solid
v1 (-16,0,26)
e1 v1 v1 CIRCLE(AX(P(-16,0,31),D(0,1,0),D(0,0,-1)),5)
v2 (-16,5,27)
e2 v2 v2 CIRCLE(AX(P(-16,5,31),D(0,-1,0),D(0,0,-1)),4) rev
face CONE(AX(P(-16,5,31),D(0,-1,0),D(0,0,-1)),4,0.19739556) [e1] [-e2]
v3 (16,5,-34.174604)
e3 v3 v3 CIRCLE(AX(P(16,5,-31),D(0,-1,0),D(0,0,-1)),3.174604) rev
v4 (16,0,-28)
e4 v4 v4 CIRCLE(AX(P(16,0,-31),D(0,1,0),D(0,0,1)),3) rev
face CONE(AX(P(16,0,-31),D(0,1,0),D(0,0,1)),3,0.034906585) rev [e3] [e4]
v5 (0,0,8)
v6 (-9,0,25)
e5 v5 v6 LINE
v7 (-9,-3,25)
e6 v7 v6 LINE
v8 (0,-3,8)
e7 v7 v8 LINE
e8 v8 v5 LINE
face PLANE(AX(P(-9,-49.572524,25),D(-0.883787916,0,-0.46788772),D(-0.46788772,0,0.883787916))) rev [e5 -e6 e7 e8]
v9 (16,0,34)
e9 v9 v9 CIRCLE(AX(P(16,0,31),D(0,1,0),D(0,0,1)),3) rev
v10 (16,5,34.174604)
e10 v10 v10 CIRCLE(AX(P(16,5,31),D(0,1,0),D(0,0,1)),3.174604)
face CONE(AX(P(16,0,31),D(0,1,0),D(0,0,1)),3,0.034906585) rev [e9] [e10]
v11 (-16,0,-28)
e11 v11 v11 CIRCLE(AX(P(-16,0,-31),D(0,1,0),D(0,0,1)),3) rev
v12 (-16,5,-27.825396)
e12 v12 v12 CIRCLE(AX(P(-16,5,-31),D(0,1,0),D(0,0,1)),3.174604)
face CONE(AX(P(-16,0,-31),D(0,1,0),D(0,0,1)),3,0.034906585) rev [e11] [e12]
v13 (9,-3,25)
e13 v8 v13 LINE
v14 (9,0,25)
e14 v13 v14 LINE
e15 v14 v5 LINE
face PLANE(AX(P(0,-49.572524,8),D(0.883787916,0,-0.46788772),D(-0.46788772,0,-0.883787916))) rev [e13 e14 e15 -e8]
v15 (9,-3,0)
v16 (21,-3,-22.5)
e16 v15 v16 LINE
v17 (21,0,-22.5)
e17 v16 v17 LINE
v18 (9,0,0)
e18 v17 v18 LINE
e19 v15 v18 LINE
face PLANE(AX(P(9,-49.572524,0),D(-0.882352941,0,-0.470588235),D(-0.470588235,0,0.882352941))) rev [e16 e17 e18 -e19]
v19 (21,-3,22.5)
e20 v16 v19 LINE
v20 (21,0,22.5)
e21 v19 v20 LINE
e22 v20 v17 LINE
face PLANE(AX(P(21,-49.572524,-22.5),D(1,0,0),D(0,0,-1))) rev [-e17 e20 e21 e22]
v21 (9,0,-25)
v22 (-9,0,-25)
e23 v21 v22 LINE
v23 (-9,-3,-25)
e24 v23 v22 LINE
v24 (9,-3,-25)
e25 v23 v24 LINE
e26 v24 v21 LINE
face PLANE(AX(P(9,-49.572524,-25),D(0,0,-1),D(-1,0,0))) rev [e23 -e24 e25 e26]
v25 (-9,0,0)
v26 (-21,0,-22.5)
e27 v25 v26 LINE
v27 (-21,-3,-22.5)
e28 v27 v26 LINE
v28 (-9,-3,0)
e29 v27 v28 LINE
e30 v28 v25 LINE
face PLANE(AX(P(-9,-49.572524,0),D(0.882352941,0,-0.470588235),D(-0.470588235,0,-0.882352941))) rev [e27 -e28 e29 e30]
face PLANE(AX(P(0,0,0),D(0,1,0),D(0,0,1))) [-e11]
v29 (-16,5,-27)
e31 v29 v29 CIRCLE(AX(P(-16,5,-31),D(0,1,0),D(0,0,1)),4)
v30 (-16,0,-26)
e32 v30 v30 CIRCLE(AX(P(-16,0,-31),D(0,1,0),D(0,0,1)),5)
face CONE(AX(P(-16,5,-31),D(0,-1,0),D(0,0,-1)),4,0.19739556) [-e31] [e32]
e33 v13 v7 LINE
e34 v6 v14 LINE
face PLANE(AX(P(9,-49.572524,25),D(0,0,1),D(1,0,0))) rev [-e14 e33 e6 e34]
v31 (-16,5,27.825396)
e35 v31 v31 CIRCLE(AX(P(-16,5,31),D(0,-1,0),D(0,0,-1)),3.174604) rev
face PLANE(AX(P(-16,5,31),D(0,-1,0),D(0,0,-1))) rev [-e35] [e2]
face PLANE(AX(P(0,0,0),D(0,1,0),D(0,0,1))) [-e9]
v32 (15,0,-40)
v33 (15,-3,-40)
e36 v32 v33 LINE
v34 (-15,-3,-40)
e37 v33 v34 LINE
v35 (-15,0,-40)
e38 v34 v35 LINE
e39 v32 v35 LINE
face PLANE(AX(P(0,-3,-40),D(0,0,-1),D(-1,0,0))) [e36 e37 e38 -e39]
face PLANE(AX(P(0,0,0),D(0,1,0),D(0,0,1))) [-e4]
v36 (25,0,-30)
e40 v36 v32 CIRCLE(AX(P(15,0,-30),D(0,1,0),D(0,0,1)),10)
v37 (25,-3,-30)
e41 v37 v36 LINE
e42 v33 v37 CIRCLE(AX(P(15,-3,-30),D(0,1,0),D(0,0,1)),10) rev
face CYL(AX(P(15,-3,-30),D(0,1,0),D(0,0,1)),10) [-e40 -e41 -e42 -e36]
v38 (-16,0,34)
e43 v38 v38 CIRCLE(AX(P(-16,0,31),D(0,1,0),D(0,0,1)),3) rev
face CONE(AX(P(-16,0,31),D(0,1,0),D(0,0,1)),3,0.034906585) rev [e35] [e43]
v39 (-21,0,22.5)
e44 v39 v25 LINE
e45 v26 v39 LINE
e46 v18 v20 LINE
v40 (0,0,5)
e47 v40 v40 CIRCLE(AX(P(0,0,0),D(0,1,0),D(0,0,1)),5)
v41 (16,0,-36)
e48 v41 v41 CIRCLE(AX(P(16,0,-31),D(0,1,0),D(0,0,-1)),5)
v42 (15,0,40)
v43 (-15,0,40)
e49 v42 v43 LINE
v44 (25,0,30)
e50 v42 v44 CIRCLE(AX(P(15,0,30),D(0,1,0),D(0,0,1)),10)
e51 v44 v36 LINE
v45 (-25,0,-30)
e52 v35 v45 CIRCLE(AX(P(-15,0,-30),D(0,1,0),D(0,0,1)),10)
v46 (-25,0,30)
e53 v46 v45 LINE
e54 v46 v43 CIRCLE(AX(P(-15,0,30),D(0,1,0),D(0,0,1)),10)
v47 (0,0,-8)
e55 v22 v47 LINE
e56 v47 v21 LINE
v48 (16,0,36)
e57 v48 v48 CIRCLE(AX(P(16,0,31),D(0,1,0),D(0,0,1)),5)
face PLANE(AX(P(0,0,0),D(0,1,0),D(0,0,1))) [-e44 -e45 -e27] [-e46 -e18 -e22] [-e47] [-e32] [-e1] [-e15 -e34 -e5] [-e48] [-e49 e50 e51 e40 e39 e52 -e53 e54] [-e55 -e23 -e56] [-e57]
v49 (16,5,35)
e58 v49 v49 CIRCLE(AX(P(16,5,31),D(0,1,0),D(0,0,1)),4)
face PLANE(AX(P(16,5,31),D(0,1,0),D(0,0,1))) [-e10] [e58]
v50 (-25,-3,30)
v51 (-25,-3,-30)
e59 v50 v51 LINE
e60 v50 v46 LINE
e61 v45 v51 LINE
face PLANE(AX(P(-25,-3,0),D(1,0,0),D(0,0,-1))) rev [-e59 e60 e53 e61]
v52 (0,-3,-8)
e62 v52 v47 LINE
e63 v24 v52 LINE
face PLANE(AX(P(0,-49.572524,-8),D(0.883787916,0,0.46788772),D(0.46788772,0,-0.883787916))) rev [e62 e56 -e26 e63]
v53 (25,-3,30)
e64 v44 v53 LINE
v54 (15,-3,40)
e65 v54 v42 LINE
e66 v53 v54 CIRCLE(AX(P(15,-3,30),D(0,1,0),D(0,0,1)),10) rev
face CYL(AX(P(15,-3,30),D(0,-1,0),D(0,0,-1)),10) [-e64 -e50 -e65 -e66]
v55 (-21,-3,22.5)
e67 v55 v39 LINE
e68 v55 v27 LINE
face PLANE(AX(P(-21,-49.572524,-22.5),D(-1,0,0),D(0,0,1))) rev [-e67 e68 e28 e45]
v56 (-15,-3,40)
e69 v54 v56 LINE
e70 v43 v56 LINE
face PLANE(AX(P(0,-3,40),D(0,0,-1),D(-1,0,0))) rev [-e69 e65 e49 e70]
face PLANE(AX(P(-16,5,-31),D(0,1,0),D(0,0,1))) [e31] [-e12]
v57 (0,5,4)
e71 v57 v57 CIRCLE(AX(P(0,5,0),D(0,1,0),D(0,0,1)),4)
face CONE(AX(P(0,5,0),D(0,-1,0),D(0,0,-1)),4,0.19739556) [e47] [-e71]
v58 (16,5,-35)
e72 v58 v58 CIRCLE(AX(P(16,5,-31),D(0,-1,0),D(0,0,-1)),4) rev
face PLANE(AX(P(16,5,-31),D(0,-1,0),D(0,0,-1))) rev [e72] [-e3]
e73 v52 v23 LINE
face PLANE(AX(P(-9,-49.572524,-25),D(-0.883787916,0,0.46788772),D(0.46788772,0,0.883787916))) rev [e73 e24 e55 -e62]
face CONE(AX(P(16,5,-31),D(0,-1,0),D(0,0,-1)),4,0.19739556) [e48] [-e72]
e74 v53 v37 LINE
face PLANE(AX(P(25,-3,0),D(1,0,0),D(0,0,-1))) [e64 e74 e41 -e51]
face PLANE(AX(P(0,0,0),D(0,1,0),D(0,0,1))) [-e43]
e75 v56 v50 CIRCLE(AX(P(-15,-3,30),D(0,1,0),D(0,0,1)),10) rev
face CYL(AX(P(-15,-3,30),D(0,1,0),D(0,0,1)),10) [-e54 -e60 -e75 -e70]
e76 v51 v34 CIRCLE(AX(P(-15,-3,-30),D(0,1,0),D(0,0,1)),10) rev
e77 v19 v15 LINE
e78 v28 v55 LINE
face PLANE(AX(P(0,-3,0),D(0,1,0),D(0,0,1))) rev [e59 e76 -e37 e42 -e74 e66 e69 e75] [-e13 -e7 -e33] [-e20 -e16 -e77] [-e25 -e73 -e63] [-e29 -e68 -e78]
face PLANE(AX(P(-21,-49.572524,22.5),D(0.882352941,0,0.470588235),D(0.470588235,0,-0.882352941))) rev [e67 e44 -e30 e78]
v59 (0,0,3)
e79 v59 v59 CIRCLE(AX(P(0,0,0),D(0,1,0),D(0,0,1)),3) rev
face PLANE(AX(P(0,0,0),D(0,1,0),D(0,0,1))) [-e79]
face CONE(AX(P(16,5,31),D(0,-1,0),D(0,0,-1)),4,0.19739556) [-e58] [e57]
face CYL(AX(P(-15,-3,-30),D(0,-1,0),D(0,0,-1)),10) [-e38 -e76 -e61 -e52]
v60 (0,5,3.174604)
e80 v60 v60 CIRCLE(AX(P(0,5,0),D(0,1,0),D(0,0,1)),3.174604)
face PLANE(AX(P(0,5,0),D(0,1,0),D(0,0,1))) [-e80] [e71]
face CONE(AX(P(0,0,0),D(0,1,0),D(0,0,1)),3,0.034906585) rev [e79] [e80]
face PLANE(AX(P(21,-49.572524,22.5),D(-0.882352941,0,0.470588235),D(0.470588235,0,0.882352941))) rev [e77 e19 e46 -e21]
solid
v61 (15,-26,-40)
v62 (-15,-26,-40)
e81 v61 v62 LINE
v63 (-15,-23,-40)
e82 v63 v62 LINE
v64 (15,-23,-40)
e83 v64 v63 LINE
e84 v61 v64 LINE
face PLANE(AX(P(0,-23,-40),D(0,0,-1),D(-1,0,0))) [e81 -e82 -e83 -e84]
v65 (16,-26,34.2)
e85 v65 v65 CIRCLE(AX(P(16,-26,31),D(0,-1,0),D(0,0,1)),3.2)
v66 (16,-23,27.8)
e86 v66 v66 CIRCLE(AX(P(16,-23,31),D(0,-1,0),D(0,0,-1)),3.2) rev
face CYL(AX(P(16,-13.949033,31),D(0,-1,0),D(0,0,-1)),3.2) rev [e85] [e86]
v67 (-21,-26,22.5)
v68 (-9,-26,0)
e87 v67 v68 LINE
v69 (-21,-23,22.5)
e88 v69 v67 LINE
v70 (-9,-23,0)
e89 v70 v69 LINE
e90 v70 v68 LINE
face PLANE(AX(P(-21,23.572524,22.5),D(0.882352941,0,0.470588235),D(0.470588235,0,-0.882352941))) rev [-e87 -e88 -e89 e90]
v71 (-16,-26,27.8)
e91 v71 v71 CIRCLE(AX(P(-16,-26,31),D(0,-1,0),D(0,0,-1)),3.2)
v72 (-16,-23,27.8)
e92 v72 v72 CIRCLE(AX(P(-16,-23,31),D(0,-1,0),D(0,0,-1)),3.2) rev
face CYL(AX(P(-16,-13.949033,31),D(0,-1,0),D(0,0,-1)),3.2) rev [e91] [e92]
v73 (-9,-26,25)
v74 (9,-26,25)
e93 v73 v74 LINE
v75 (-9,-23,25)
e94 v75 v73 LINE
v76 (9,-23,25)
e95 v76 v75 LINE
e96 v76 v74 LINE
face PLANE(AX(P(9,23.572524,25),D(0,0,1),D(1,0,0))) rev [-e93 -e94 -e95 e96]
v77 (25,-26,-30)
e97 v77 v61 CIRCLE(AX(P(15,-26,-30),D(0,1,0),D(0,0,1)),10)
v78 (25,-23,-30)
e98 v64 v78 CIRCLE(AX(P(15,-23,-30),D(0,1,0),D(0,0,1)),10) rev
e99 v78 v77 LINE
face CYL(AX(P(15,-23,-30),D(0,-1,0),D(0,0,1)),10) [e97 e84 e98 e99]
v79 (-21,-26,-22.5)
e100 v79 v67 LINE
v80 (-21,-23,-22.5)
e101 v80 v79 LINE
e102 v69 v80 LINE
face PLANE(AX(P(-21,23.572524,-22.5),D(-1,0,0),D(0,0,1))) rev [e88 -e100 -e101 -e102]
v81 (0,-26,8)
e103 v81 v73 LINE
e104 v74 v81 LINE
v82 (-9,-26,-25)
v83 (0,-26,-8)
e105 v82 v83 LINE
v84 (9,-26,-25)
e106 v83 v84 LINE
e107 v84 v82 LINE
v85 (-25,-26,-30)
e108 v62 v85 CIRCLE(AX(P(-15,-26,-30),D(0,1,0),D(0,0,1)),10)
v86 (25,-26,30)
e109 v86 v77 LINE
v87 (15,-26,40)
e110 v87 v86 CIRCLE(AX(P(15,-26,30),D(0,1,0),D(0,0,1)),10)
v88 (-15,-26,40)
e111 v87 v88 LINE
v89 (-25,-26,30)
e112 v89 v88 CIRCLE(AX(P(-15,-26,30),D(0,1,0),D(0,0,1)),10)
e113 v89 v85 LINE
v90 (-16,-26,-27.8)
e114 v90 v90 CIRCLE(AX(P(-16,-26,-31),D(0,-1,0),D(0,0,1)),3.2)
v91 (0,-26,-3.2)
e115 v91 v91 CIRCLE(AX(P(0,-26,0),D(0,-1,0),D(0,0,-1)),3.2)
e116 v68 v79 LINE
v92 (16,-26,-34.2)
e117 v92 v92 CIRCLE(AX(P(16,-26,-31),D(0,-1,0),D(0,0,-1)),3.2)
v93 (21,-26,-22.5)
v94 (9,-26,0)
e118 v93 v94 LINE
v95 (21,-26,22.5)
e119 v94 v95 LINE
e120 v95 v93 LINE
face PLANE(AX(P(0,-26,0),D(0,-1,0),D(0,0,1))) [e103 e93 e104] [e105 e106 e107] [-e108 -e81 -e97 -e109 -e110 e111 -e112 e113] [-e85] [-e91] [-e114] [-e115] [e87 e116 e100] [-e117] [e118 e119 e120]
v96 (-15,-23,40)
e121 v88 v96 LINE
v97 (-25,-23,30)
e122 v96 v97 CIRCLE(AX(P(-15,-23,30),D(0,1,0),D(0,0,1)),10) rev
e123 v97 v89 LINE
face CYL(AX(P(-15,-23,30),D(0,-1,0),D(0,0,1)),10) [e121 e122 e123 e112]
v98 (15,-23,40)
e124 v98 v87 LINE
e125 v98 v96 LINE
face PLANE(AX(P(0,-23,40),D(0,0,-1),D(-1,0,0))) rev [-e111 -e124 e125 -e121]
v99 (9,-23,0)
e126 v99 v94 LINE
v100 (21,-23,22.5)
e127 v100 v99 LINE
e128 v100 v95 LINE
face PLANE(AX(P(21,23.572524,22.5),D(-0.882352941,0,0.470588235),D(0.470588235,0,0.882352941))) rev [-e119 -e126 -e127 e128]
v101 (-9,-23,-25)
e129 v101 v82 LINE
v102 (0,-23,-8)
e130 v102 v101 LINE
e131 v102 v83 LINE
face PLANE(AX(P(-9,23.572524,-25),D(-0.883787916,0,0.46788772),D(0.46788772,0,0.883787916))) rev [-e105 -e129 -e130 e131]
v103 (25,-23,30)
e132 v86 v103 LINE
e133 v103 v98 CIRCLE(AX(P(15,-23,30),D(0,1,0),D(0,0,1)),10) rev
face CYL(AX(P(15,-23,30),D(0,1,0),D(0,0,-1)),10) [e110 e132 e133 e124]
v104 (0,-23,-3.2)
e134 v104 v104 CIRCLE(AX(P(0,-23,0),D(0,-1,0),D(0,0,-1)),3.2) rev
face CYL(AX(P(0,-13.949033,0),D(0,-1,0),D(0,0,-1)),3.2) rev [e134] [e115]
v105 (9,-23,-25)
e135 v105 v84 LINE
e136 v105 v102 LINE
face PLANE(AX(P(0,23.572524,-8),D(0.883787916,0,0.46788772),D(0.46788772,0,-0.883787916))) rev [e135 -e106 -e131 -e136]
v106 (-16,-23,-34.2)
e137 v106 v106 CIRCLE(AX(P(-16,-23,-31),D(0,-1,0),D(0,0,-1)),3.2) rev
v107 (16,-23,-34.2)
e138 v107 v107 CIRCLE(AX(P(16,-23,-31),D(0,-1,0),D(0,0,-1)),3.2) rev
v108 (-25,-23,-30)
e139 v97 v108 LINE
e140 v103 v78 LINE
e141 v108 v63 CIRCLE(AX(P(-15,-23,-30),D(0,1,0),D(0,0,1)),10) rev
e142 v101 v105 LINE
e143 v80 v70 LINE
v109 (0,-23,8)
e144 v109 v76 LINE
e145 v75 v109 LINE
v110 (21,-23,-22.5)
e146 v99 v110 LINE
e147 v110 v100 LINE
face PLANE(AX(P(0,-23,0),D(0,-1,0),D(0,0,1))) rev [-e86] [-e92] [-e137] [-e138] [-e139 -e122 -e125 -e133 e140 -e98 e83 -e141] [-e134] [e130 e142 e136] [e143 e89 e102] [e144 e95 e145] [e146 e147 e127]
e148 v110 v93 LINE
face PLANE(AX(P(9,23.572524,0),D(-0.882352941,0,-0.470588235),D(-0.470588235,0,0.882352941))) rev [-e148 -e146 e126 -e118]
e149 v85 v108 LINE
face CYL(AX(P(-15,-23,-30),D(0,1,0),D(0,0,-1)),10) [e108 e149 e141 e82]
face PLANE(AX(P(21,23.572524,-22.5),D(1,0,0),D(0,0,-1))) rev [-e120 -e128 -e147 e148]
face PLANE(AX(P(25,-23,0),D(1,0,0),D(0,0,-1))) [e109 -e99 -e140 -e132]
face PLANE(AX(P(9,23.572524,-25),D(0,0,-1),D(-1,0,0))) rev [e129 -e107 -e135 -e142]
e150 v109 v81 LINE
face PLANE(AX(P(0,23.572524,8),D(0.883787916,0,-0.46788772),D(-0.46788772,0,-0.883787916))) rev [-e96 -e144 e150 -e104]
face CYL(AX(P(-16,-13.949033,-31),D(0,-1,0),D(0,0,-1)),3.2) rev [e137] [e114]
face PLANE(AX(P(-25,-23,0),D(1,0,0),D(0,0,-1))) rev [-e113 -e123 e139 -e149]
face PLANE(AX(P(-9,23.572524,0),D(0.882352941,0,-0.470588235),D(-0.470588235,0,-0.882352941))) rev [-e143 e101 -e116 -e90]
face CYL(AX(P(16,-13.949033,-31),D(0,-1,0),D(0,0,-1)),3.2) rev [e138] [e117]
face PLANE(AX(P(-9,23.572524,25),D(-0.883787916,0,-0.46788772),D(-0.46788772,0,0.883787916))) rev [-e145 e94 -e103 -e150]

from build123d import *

# Parameters (mm, degrees)
SKETCH2_W           = 50
SKETCH2_H           = 80
BOSS_EXTRUDE1_DEPTH = 3
SKETCH3_R           = 5
SKETCH3_R_2         = 3
BOSS_EXTRUDE2_DEPTH = 5
CHAMFER1_SIZE       = 5
CHAMFER1_SIZE_2     = 1
CUT_EXTRUDE1_DEPTH  = 3
FILLET1_R           = 10
DRAFT3_ANGLE        = 2
SKETCH5_W           = 50
SKETCH5_H           = 80
CUT_EXTRUDE2_DEPTH  = 5
SKETCH6_R           = 3.2
CUT_EXTRUDE4_DEPTH  = 3


with BuildPart() as part:
    # Sketch2 → Boss-Extrude1 (new body)
    with BuildSketch(Plane(origin=(0, 0, 0), x_dir=(1, 0, 0), z_dir=(0, 1, 0))):
        Rectangle(SKETCH2_W, SKETCH2_H)
    extrude(amount=-BOSS_EXTRUDE1_DEPTH)

    # Sketch3 → Boss-Extrude2 (add)
    # profile 1 of 5: a face of its own
    with BuildSketch(Plane(origin=(0, 0, 0), x_dir=(1, 0, 0), z_dir=(0, 1, 0))):
        with Locations(Location((-16, 31, 0), (0, 0, 270))):
            Circle(SKETCH3_R)
        with Locations(Location((-16, 31, 0), (0, 0, 270))):
            Circle(SKETCH3_R_2, mode=Mode.SUBTRACT)
    # profile 2 of 5: a face of its own
    with BuildSketch(Plane(origin=(0, 0, 0), x_dir=(1, 0, 0), z_dir=(0, 1, 0))):
        with Locations(Location((16, 31, 0), (0, 0, 90))):
            Circle(SKETCH3_R)
        with Locations(Location((16, 31, 0), (0, 0, 90))):
            Circle(SKETCH3_R_2, mode=Mode.SUBTRACT)
    # profile 3 of 5: a face of its own
    with BuildSketch(Plane(origin=(0, 0, 0), x_dir=(1, 0, 0), z_dir=(0, 1, 0))):
        with Locations(Location((16, -31, 0), (0, 0, 270))):
            Circle(SKETCH3_R)
        with Locations(Location((16, -31, 0), (0, 0, 270))):
            Circle(SKETCH3_R_2, mode=Mode.SUBTRACT)
    # profile 4 of 5: a face of its own
    with BuildSketch(Plane(origin=(0, 0, 0), x_dir=(1, 0, 0), z_dir=(0, 1, 0))):
        with Locations(Location((-16, -31, 0), (0, 0, 90))):
            Circle(SKETCH3_R)
        with Locations(Location((-16, -31, 0), (0, 0, 90))):
            Circle(SKETCH3_R_2, mode=Mode.SUBTRACT)
    # profile 5 of 5: a face of its own
    with BuildSketch(Plane(origin=(0, 0, 0), x_dir=(1, 0, 0), z_dir=(0, 1, 0))):
        with Locations(Location((0, 0, 0), (0, 0, 270))):
            Circle(SKETCH3_R)
        with Locations(Location((0, 0, 0), (0, 0, 270))):
            Circle(SKETCH3_R_2, mode=Mode.SUBTRACT)
    extrude(amount=BOSS_EXTRUDE2_DEPTH)

    # Chamfer1
    # the kernel refuses this chamfer: 5, 1 mm, written as the material it takes off along each edge
    with BuildSketch(Plane(origin=(-16, 5, -31), x_dir=(0, 0, 1), z_dir=(-1, 0, 0))) as chamfer1_piece_1_section:
        Polygon((5, -CHAMFER1_SIZE), (5 - CHAMFER1_SIZE_2, 0), (5, 0), align=None)
    chamfer1_piece_1 = revolve(axis=Axis((-16, 5, -31), (0, 1, 0)), mode=Mode.PRIVATE)
    chamfer1_piece_1 = split(chamfer1_piece_1, bisect_by=Plane(origin=(-16, 0, -35.524949773), z_dir=(0, 1, 0)), keep=Keep.TOP, mode=Mode.PRIVATE)
    add(chamfer1_piece_1, mode=Mode.SUBTRACT)
    with BuildSketch(Plane(origin=(16, 5, -31), x_dir=(0, 0, -1), z_dir=(1, 0, 0))) as chamfer1_piece_2_section:
        Polygon((5, -CHAMFER1_SIZE), (5 - CHAMFER1_SIZE_2, 0), (5, 0), align=None)
    chamfer1_piece_2 = revolve(axis=Axis((16, 5, -31), (0, 1, 0)), mode=Mode.PRIVATE)
    chamfer1_piece_2 = split(chamfer1_piece_2, bisect_by=Plane(origin=(16, 0, -26.475050227), z_dir=(0, 1, 0)), keep=Keep.TOP, mode=Mode.PRIVATE)
    add(chamfer1_piece_2, mode=Mode.SUBTRACT)
    with BuildSketch(Plane(origin=(16, 5, 31), x_dir=(0, 0, 1), z_dir=(-1, 0, 0))) as chamfer1_piece_3_section:
        Polygon((5, -CHAMFER1_SIZE), (5 - CHAMFER1_SIZE_2, 0), (5, 0), align=None)
    chamfer1_piece_3 = revolve(axis=Axis((16, 5, 31), (0, 1, 0)), mode=Mode.PRIVATE)
    chamfer1_piece_3 = split(chamfer1_piece_3, bisect_by=Plane(origin=(16, 0, 26.475050227), z_dir=(0, 1, 0)), keep=Keep.TOP, mode=Mode.PRIVATE)
    add(chamfer1_piece_3, mode=Mode.SUBTRACT)
    with BuildSketch(Plane(origin=(-16, 5, 31), x_dir=(0, 0, -1), z_dir=(1, 0, 0))) as chamfer1_piece_4_section:
        Polygon((5, -CHAMFER1_SIZE), (5 - CHAMFER1_SIZE_2, 0), (5, 0), align=None)
    chamfer1_piece_4 = revolve(axis=Axis((-16, 5, 31), (0, 1, 0)), mode=Mode.PRIVATE)
    chamfer1_piece_4 = split(chamfer1_piece_4, bisect_by=Plane(origin=(-16, 0, 35.524949773), z_dir=(0, 1, 0)), keep=Keep.TOP, mode=Mode.PRIVATE)
    add(chamfer1_piece_4, mode=Mode.SUBTRACT)
    with BuildSketch(Plane(origin=(0, 5, 0), x_dir=(0, 0, 1), z_dir=(-1, 0, 0))) as chamfer1_piece_5_section:
        Polygon((5, -CHAMFER1_SIZE), (5 - CHAMFER1_SIZE_2, 0), (5, 0), align=None)
    chamfer1_piece_5 = revolve(axis=Axis((0, 5, 0), (0, 1, 0)), mode=Mode.PRIVATE)
    chamfer1_piece_5 = split(chamfer1_piece_5, bisect_by=Plane(origin=(0, 0, -4.524949773), z_dir=(0, 1, 0)), keep=Keep.TOP, mode=Mode.PRIVATE)
    add(chamfer1_piece_5, mode=Mode.SUBTRACT)

    # Sketch4 → Cut-Extrude1 (cut)
    with BuildSketch(Plane(origin=(0, 0, 0), x_dir=(1, 0, 0), z_dir=(0, 1, 0))):
        Polygon((-21, 22.5), (-21, -22.5), (-9, 0), align=None)
        Polygon((9, 0), (21, 22.5), (21, -22.5), align=None)
        Polygon((0, 8), (9, 25), (-9, 25), align=None)
        Polygon((0, -8), (9, -25), (-9, -25), align=None)
    extrude(amount=-CUT_EXTRUDE1_DEPTH, mode=Mode.SUBTRACT)

    # Fillet1
    fillet1_edges = [part.edges().sort_by_distance(p)[0] for p in [
        (-25, -1.5, -40),
        (25, -1.5, -40),
        (25, -1.5, 40),
        (-25, -1.5, 40),
    ]]
    fillet(fillet1_edges, radius=FILLET1_R)

    # Draft3
    draft3_faces = [part.faces().sort_by_distance(p)[0] for p in [
        (16, 2.5, -28),
        (-16, 2.5, -34),
        (-16, 2.5, 34),
        (0, 2.5, -3),
        (16, 2.5, 28),
    ]]
    draft(draft3_faces, Plane.ZX, DRAFT3_ANGLE)


with BuildPart() as body_2:
    # Mirror5: mirrored copy
    add(part.part.mirror(Plane(origin=(0, -13, 0), x_dir=(0, 0, 1), z_dir=(0, -1, 0))))

    # Sketch5 → Cut-Extrude2 (cut)
    with BuildSketch(Plane.XZ.offset(31)):
        Rectangle(SKETCH5_W, SKETCH5_H)
    extrude(amount=-CUT_EXTRUDE2_DEPTH, mode=Mode.SUBTRACT)

    # Sketch6 → Cut-Extrude4 (cut)
    with BuildSketch(Plane.XZ.offset(26)):
        with Locations(Location((-16, 31, 0), (0, 0, 270))):
            Circle(SKETCH6_R)
        with Locations(Location((0, 0, 0), (0, 0, 270))):
            Circle(SKETCH6_R)
        with Locations(Location((-16, -31, 0), (0, 0, 270))):
            Circle(SKETCH6_R)
        with Locations(Location((16, 31, 0), (0, 0, 270))):
            Circle(SKETCH6_R)
        with Locations(Location((16, -31, 0), (0, 0, 270))):
            Circle(SKETCH6_R)
    extrude(amount=-CUT_EXTRUDE4_DEPTH, mode=Mode.SUBTRACT)


solid = Compound([part.part, body_2.part])
